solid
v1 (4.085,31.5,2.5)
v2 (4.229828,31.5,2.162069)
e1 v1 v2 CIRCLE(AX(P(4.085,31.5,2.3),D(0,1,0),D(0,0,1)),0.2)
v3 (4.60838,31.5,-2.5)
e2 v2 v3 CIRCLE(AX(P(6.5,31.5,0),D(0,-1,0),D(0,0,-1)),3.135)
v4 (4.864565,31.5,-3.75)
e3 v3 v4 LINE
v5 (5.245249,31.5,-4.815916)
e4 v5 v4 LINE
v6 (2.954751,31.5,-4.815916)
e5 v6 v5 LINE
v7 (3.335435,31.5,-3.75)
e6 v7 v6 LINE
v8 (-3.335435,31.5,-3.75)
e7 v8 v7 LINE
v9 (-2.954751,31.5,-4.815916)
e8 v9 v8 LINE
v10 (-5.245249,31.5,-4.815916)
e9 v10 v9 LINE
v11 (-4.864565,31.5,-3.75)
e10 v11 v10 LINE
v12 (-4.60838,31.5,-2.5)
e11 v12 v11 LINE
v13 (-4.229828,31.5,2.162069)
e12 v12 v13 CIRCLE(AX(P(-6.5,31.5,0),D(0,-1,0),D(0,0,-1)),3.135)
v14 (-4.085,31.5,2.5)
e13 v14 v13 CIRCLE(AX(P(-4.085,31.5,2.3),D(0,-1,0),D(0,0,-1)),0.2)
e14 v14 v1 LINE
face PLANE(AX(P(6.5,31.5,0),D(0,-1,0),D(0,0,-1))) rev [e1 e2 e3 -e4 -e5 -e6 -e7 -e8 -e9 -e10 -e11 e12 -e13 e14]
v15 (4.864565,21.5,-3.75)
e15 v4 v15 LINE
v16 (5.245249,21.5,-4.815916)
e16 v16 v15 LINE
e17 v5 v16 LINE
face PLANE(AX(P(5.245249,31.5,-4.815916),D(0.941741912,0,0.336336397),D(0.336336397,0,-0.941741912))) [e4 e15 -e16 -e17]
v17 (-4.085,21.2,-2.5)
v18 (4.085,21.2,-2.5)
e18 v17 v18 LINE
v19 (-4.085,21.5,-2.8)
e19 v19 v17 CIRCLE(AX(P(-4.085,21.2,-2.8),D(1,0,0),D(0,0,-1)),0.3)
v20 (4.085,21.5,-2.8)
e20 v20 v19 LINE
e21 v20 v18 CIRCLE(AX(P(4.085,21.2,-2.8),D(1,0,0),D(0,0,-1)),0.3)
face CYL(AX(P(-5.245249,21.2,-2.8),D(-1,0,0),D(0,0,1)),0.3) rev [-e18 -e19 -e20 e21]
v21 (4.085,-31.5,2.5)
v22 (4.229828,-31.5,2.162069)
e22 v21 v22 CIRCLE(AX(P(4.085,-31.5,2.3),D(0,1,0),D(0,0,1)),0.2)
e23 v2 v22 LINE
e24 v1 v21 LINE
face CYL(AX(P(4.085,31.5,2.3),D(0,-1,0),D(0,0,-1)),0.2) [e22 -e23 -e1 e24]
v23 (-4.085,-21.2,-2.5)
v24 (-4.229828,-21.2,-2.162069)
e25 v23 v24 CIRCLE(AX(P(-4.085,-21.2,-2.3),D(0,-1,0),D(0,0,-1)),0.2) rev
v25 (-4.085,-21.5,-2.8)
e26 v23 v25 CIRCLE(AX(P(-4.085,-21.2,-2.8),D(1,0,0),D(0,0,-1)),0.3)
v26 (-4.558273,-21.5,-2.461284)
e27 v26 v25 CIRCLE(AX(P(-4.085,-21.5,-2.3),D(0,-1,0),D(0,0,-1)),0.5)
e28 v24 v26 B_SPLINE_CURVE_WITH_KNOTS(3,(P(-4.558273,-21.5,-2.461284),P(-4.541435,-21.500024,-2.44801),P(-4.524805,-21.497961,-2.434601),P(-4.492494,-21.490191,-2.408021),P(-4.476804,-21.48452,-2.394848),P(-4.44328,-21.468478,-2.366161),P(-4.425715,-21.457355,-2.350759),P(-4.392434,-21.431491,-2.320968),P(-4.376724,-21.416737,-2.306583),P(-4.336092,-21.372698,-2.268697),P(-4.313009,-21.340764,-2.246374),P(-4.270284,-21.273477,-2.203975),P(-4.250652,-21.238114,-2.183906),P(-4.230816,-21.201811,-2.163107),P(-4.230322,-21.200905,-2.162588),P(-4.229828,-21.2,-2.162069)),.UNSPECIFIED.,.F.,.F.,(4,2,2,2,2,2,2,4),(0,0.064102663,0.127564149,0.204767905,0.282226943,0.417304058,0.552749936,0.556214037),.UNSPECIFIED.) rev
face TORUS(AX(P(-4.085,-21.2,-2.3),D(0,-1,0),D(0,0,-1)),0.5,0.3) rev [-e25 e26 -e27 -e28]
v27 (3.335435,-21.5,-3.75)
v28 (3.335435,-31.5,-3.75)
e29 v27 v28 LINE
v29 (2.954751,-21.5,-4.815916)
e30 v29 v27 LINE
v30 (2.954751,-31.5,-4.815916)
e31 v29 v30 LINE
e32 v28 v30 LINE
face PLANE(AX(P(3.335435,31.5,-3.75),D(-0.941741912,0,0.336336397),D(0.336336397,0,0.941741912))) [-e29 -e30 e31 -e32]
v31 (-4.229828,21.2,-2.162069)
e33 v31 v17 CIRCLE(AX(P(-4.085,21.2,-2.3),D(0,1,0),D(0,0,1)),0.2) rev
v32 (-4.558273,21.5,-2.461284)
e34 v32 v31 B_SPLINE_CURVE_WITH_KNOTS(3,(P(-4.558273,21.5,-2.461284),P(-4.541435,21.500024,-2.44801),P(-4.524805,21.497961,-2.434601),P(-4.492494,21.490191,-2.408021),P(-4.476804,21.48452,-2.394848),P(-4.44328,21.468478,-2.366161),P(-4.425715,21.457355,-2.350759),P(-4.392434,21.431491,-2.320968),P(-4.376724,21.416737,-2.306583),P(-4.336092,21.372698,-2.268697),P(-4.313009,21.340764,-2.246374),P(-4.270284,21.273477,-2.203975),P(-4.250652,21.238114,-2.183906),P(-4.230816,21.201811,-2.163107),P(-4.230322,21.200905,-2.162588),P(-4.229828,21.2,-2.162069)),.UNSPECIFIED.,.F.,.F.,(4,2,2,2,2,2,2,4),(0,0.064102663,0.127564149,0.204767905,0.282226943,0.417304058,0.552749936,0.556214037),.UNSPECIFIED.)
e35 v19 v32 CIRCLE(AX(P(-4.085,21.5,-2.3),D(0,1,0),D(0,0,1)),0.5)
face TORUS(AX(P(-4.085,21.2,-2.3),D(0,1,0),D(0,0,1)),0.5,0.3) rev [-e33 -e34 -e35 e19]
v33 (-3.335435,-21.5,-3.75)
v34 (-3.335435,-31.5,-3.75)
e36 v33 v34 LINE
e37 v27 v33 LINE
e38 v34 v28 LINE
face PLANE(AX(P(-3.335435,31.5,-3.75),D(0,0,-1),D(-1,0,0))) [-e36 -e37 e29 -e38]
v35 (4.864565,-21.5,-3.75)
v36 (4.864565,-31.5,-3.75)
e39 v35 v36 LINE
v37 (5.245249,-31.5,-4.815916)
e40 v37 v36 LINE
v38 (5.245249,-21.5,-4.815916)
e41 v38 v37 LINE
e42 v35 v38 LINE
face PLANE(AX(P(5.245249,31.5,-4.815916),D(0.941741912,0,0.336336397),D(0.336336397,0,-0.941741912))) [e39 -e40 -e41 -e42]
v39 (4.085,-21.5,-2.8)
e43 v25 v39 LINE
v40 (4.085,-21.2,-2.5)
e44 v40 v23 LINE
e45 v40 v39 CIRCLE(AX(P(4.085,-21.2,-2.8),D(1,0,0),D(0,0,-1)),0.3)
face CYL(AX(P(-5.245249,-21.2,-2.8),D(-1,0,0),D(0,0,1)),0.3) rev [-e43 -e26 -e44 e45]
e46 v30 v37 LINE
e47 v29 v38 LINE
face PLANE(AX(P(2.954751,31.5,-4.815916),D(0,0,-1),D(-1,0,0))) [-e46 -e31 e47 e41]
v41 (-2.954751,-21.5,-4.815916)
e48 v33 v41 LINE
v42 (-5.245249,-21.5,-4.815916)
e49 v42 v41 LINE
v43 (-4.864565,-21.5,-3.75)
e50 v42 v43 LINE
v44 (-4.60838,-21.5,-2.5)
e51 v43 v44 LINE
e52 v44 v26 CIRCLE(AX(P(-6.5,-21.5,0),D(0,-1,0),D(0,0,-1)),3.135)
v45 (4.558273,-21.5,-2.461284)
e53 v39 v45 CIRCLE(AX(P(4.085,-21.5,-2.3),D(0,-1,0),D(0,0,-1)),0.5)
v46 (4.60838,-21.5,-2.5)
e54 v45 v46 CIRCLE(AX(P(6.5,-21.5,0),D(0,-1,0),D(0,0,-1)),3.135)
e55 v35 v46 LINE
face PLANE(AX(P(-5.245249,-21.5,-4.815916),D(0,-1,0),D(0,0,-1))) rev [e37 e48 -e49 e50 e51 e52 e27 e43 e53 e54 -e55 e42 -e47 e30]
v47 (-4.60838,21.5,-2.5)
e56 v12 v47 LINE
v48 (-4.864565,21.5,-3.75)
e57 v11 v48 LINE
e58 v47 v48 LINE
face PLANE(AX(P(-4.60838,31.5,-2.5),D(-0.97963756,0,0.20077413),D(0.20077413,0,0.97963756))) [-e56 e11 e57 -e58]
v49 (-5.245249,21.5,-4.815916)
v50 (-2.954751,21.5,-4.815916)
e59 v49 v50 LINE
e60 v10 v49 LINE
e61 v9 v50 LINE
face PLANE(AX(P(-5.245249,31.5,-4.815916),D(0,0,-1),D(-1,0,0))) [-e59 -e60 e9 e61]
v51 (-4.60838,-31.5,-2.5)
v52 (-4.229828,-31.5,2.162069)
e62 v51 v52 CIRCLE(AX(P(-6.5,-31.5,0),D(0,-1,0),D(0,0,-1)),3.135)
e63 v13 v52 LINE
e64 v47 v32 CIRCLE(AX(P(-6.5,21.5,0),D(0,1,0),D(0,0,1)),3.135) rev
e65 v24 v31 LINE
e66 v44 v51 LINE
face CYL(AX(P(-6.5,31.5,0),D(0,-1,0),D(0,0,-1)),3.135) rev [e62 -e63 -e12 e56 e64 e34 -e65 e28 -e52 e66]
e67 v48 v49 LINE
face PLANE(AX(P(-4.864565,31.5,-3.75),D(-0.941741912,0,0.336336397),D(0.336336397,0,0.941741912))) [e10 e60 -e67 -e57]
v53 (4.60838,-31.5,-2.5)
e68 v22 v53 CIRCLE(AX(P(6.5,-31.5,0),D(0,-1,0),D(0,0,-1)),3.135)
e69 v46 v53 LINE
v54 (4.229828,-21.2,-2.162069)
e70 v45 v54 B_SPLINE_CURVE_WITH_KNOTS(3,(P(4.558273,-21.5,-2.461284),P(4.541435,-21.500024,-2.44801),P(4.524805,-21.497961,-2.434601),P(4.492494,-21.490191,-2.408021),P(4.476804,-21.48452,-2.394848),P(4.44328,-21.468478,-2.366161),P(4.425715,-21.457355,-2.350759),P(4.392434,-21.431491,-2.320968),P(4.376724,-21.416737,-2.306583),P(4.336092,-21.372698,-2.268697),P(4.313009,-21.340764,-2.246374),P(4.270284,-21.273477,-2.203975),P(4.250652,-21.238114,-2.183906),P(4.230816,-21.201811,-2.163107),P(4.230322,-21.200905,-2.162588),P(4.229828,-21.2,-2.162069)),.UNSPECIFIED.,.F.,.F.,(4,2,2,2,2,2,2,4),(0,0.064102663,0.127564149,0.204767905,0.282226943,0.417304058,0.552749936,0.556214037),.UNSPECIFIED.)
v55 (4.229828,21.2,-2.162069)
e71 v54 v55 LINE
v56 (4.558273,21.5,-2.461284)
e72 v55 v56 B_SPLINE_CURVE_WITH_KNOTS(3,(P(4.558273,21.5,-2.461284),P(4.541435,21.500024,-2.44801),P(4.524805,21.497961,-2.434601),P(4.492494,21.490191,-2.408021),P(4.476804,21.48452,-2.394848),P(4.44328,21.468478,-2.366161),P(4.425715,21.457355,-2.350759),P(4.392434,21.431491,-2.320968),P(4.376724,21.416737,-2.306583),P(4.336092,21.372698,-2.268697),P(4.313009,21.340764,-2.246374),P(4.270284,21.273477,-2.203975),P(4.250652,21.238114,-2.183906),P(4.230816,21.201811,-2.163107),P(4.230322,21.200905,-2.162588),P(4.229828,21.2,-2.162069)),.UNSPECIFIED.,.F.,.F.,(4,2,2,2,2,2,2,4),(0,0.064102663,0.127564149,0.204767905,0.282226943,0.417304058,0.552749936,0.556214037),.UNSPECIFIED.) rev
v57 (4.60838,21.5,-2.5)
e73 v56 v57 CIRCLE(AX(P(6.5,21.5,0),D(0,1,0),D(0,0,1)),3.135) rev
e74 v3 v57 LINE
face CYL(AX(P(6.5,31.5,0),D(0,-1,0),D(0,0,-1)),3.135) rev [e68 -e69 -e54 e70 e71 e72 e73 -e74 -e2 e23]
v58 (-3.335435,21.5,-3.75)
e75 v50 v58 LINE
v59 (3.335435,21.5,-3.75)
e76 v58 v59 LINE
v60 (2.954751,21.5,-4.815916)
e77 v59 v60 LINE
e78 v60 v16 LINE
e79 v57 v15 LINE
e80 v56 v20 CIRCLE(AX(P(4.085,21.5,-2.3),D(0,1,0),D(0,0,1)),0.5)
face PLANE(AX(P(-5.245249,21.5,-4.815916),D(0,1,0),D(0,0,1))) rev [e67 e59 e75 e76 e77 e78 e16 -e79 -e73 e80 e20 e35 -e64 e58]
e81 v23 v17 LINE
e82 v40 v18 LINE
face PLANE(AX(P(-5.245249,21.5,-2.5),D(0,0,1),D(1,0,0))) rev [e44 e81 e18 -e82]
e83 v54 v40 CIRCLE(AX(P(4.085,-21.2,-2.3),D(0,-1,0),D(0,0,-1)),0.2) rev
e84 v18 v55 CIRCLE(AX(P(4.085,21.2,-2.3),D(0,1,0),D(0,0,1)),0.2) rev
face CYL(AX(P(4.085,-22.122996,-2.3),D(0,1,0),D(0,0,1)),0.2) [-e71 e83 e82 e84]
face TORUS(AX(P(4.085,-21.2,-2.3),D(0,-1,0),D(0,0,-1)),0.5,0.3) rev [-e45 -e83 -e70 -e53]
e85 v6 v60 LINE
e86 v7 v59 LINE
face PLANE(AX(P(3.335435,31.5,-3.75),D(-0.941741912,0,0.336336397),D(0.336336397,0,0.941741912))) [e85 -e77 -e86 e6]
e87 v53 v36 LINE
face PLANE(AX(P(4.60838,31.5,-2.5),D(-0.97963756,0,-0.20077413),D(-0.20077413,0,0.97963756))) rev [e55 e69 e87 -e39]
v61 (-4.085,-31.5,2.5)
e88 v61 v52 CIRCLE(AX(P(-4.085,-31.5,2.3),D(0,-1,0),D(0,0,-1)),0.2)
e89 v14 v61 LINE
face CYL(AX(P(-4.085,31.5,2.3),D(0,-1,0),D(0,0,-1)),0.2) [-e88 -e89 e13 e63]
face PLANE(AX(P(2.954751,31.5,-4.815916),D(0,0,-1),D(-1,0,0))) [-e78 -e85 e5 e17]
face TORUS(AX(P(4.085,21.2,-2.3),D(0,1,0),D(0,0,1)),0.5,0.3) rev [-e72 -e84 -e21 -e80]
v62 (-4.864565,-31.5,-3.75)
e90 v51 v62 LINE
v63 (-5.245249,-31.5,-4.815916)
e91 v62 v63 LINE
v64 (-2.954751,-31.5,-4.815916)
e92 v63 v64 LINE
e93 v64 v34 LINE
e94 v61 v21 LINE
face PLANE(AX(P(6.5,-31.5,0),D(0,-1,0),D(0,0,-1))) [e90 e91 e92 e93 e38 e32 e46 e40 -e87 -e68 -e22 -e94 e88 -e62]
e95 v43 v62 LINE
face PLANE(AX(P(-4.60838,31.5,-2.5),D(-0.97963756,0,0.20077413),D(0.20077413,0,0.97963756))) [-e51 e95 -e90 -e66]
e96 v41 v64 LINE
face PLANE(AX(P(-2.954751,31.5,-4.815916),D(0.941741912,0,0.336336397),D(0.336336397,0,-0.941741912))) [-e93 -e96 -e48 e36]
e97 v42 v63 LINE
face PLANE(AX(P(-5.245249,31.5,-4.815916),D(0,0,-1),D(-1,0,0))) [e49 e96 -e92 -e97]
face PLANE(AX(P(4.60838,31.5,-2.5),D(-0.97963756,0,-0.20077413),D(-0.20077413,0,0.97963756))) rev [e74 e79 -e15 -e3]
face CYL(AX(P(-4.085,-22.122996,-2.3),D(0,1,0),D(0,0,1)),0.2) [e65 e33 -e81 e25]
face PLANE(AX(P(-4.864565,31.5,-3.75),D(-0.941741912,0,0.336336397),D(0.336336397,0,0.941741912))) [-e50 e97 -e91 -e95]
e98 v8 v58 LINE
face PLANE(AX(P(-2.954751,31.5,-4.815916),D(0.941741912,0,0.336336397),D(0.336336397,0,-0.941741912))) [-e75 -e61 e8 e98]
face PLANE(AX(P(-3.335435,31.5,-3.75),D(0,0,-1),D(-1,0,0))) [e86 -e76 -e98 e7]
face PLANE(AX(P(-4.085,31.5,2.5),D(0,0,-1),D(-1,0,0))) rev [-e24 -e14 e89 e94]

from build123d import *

# Parameters (mm, degrees)
BOSS_EXTRUDE2_DEPTH     = 31.5
CUT_EXTRUDE1_DEPTH      = 33.294824363
CUT_EXTRUDE1_DEPTH_BACK = 33.294824363
SKETCH2_W               = 2.315915901
SKETCH2_H               = 43
CUT_EXTRUDE2_START      = -21.5
CUT_EXTRUDE2_DEPTH      = 43
FILLET1_R               = 0.3


with BuildPart() as part:
    # Sketch1 → Boss-Extrude2 (new, symmetric)
    with BuildSketch(Plane(origin=(0, 0, 0), x_dir=(1, 0, 0), z_dir=(0, 1, 0))):
        with BuildLine():
            Line((-4.085, -2.5), (4.085, -2.5))
            ThreePointArc((4.085, -2.5), (4.268829006, -2.37878386), (4.229827586, -2.162068966))
            ThreePointArc((4.229827586, -2.162068966), (3.375283995, 0.253722072), (4.608380324, 2.5))
            Line((4.608380324, 2.5), (4.864564522, 3.75))
            Line((4.864564522, 3.75), (5.245248772, 4.815915901))
            Line((5.245248772, 4.815915901), (2.954751228, 4.815915901))
            Line((2.954751228, 4.815915901), (3.335435478, 3.75))
            Line((3.335435478, 3.75), (-3.335435478, 3.75))
            Line((-3.335435478, 3.75), (-2.954751228, 4.815915901))
            Line((-2.954751228, 4.815915901), (-5.245248772, 4.815915901))
            Line((-5.245248772, 4.815915901), (-4.864564522, 3.75))
            Line((-4.864564522, 3.75), (-4.608380324, 2.5))
            ThreePointArc((-4.608380324, 2.5), (-3.375283995, 0.253722072), (-4.229827586, -2.162068966))
            ThreePointArc((-4.229827586, -2.162068966), (-4.268829006, -2.37878386), (-4.085, -2.5))
        make_face()
    extrude(amount=BOSS_EXTRUDE2_DEPTH, both=True)

    # Sketch2 → Cut-Extrude1 (cut, two sides: drawn at the far end of the back side and taken through both)
    with BuildSketch(Plane(origin=(0, 0, 0), x_dir=(0, 0, -1), z_dir=(1, 0, 0)).offset(-CUT_EXTRUDE1_DEPTH_BACK)):
        with Locations((3.657957951, 0)):
            Rectangle(SKETCH2_W, SKETCH2_H)
    extrude(amount=CUT_EXTRUDE1_DEPTH + CUT_EXTRUDE1_DEPTH_BACK, mode=Mode.SUBTRACT)

    # Sketch3 → Cut-Extrude2 (cut)
    with BuildSketch(Plane(origin=(0, 0, 0), x_dir=(1, 0, 0), z_dir=(0, 1, 0)).offset(CUT_EXTRUDE2_START)):
        with BuildLine():
            Line((4.608380324, 2.5), (4.085, 2.5))
            ThreePointArc((4.085, 2.5), (4.268829006, 2.37878386), (4.229827586, 2.162068966))
            ThreePointArc((4.229827586, 2.162068966), (4.412255357, 2.338706331), (4.608380324, 2.5))
        make_face()
        with BuildLine():
            Line((-4.085, 2.5), (-4.608380324, 2.5))
            ThreePointArc((-4.608380324, 2.5), (-4.412255357, 2.338706331), (-4.229827586, 2.162068966))
            ThreePointArc((-4.229827586, 2.162068966), (-4.268829006, 2.37878386), (-4.085, 2.5))
        make_face()
    extrude(amount=CUT_EXTRUDE2_DEPTH, mode=Mode.SUBTRACT)

    # Fillet1
    # the kernel refuses this fillet: 0.3 mm, written as the material it adds along each edge
    with BuildSketch(Plane(origin=(-4.085, 21.5, -2.5), x_dir=(0, 0, -1), z_dir=(1, 0, 0))) as fillet1_piece_1:
        with BuildLine():
            CenterArc((FILLET1_R, -FILLET1_R), FILLET1_R, 90, 90)
            Line((0, -FILLET1_R), (0, 0))
            Line((0, 0), (FILLET1_R, 0))
        make_face()
    extrude(amount=8.17)
    with BuildSketch(Plane(origin=(-4.085, -21.5, -2.5), x_dir=(0, 0, -1), z_dir=(1, 0, 0))) as fillet1_piece_2:
        with BuildLine():
            CenterArc((FILLET1_R, FILLET1_R), FILLET1_R, 180, 90)
            Line((0, FILLET1_R), (0, 0))
            Line((0, 0), (FILLET1_R, 0))
        make_face()
    extrude(amount=8.17)
    with BuildSketch(Plane(origin=(4.085, -21.5, -2.3), x_dir=(0, 0, -1), z_dir=(-1, 0, 0))) as fillet1_piece_3_section:
        with BuildLine():
            CenterArc((0.2 + FILLET1_R, -FILLET1_R), FILLET1_R, 90, 90)
            Line((0.2 + FILLET1_R, 0), (0.2, 0))
            Line((0.2, 0), (0.2, -FILLET1_R))
        make_face()
    fillet1_piece_3 = revolve(axis=Axis((4.085, -21.5, -2.3), (0, -1, 0)), revolution_arc=348.652256653, mode=Mode.PRIVATE)
    fillet1_piece_3 = fillet1_piece_3 - Plane(origin=(6.5, -21.422221686, 0), x_dir=(-0.7241379310344833, 0, 0.6896551724137925), z_dir=(0, 1, 0)) * Cylinder(3.135, 3, mode=Mode.PRIVATE)
    add(fillet1_piece_3)
    with BuildSketch(Plane(origin=(4.085, 21.5, -2.3), x_dir=(0, 0, -1), z_dir=(-1, 0, 0))) as fillet1_piece_4_section:
        with BuildLine():
            CenterArc((0.2 + FILLET1_R, FILLET1_R), FILLET1_R, 180, 90)
            Line((0.2, FILLET1_R), (0.2, 0))
            Line((0.2, 0), (0.2 + FILLET1_R, 0))
        make_face()
    fillet1_piece_4 = revolve(axis=Axis((4.085, 21.5, -2.3), (0, -1, 0)), revolution_arc=348.652256653, mode=Mode.PRIVATE)
    fillet1_piece_4 = fillet1_piece_4 - Plane(origin=(6.5, 21.453136738, 0), x_dir=(-0.7241379310344833, 0, 0.6896551724137925), z_dir=(0, 1, 0)) * Cylinder(3.135, 3, mode=Mode.PRIVATE)
    add(fillet1_piece_4)
    with BuildSketch(Plane(origin=(-4.085, -21.5, -2.3), x_dir=(0.19676320132500988, 0, -0.9804510403912751), z_dir=(-0.9804510403912751, 0, -0.19676320132500988))) as fillet1_piece_5_section:
        with BuildLine():
            CenterArc((-0.2 - FILLET1_R, -FILLET1_R), FILLET1_R, 0, 90)
            Line((-0.2, -FILLET1_R), (-0.2, 0))
            Line((-0.2, 0), (-0.2 - FILLET1_R, 0))
        make_face()
    fillet1_piece_5 = revolve(axis=Axis((-4.085, -21.5, -2.3), (0, -1, 0)), revolution_arc=348.652256653, mode=Mode.PRIVATE)
    fillet1_piece_5 = fillet1_piece_5 - Plane(origin=(-6.5, -21.422220157, 0), x_dir=(0.6033874565748113, 0, -0.7974481658692183), z_dir=(0, 1, 0)) * Cylinder(3.135, 2, mode=Mode.PRIVATE)
    add(fillet1_piece_5)
    with BuildSketch(Plane(origin=(-4.085, 21.5, -2.3), x_dir=(0.1967632013250235, 0, -0.9804510403912723), z_dir=(-0.9804510403912723, 0, -0.1967632013250235))) as fillet1_piece_6_section:
        with BuildLine():
            CenterArc((-0.2 - FILLET1_R, FILLET1_R), FILLET1_R, 270, 90)
            Line((-0.2, FILLET1_R), (-0.2, 0))
            Line((-0.2, 0), (-0.2 - FILLET1_R, 0))
        make_face()
    fillet1_piece_6 = revolve(axis=Axis((-4.085, 21.5, -2.3), (0, -1, 0)), revolution_arc=348.652256653, mode=Mode.PRIVATE)
    fillet1_piece_6 = fillet1_piece_6 - Plane(origin=(-6.5, 21.422220134, 0), x_dir=(0.6033874565748113, 0, -0.7974481658692183), z_dir=(0, 1, 0)) * Cylinder(3.135, 2, mode=Mode.PRIVATE)
    add(fillet1_piece_6)


solid = part.part
